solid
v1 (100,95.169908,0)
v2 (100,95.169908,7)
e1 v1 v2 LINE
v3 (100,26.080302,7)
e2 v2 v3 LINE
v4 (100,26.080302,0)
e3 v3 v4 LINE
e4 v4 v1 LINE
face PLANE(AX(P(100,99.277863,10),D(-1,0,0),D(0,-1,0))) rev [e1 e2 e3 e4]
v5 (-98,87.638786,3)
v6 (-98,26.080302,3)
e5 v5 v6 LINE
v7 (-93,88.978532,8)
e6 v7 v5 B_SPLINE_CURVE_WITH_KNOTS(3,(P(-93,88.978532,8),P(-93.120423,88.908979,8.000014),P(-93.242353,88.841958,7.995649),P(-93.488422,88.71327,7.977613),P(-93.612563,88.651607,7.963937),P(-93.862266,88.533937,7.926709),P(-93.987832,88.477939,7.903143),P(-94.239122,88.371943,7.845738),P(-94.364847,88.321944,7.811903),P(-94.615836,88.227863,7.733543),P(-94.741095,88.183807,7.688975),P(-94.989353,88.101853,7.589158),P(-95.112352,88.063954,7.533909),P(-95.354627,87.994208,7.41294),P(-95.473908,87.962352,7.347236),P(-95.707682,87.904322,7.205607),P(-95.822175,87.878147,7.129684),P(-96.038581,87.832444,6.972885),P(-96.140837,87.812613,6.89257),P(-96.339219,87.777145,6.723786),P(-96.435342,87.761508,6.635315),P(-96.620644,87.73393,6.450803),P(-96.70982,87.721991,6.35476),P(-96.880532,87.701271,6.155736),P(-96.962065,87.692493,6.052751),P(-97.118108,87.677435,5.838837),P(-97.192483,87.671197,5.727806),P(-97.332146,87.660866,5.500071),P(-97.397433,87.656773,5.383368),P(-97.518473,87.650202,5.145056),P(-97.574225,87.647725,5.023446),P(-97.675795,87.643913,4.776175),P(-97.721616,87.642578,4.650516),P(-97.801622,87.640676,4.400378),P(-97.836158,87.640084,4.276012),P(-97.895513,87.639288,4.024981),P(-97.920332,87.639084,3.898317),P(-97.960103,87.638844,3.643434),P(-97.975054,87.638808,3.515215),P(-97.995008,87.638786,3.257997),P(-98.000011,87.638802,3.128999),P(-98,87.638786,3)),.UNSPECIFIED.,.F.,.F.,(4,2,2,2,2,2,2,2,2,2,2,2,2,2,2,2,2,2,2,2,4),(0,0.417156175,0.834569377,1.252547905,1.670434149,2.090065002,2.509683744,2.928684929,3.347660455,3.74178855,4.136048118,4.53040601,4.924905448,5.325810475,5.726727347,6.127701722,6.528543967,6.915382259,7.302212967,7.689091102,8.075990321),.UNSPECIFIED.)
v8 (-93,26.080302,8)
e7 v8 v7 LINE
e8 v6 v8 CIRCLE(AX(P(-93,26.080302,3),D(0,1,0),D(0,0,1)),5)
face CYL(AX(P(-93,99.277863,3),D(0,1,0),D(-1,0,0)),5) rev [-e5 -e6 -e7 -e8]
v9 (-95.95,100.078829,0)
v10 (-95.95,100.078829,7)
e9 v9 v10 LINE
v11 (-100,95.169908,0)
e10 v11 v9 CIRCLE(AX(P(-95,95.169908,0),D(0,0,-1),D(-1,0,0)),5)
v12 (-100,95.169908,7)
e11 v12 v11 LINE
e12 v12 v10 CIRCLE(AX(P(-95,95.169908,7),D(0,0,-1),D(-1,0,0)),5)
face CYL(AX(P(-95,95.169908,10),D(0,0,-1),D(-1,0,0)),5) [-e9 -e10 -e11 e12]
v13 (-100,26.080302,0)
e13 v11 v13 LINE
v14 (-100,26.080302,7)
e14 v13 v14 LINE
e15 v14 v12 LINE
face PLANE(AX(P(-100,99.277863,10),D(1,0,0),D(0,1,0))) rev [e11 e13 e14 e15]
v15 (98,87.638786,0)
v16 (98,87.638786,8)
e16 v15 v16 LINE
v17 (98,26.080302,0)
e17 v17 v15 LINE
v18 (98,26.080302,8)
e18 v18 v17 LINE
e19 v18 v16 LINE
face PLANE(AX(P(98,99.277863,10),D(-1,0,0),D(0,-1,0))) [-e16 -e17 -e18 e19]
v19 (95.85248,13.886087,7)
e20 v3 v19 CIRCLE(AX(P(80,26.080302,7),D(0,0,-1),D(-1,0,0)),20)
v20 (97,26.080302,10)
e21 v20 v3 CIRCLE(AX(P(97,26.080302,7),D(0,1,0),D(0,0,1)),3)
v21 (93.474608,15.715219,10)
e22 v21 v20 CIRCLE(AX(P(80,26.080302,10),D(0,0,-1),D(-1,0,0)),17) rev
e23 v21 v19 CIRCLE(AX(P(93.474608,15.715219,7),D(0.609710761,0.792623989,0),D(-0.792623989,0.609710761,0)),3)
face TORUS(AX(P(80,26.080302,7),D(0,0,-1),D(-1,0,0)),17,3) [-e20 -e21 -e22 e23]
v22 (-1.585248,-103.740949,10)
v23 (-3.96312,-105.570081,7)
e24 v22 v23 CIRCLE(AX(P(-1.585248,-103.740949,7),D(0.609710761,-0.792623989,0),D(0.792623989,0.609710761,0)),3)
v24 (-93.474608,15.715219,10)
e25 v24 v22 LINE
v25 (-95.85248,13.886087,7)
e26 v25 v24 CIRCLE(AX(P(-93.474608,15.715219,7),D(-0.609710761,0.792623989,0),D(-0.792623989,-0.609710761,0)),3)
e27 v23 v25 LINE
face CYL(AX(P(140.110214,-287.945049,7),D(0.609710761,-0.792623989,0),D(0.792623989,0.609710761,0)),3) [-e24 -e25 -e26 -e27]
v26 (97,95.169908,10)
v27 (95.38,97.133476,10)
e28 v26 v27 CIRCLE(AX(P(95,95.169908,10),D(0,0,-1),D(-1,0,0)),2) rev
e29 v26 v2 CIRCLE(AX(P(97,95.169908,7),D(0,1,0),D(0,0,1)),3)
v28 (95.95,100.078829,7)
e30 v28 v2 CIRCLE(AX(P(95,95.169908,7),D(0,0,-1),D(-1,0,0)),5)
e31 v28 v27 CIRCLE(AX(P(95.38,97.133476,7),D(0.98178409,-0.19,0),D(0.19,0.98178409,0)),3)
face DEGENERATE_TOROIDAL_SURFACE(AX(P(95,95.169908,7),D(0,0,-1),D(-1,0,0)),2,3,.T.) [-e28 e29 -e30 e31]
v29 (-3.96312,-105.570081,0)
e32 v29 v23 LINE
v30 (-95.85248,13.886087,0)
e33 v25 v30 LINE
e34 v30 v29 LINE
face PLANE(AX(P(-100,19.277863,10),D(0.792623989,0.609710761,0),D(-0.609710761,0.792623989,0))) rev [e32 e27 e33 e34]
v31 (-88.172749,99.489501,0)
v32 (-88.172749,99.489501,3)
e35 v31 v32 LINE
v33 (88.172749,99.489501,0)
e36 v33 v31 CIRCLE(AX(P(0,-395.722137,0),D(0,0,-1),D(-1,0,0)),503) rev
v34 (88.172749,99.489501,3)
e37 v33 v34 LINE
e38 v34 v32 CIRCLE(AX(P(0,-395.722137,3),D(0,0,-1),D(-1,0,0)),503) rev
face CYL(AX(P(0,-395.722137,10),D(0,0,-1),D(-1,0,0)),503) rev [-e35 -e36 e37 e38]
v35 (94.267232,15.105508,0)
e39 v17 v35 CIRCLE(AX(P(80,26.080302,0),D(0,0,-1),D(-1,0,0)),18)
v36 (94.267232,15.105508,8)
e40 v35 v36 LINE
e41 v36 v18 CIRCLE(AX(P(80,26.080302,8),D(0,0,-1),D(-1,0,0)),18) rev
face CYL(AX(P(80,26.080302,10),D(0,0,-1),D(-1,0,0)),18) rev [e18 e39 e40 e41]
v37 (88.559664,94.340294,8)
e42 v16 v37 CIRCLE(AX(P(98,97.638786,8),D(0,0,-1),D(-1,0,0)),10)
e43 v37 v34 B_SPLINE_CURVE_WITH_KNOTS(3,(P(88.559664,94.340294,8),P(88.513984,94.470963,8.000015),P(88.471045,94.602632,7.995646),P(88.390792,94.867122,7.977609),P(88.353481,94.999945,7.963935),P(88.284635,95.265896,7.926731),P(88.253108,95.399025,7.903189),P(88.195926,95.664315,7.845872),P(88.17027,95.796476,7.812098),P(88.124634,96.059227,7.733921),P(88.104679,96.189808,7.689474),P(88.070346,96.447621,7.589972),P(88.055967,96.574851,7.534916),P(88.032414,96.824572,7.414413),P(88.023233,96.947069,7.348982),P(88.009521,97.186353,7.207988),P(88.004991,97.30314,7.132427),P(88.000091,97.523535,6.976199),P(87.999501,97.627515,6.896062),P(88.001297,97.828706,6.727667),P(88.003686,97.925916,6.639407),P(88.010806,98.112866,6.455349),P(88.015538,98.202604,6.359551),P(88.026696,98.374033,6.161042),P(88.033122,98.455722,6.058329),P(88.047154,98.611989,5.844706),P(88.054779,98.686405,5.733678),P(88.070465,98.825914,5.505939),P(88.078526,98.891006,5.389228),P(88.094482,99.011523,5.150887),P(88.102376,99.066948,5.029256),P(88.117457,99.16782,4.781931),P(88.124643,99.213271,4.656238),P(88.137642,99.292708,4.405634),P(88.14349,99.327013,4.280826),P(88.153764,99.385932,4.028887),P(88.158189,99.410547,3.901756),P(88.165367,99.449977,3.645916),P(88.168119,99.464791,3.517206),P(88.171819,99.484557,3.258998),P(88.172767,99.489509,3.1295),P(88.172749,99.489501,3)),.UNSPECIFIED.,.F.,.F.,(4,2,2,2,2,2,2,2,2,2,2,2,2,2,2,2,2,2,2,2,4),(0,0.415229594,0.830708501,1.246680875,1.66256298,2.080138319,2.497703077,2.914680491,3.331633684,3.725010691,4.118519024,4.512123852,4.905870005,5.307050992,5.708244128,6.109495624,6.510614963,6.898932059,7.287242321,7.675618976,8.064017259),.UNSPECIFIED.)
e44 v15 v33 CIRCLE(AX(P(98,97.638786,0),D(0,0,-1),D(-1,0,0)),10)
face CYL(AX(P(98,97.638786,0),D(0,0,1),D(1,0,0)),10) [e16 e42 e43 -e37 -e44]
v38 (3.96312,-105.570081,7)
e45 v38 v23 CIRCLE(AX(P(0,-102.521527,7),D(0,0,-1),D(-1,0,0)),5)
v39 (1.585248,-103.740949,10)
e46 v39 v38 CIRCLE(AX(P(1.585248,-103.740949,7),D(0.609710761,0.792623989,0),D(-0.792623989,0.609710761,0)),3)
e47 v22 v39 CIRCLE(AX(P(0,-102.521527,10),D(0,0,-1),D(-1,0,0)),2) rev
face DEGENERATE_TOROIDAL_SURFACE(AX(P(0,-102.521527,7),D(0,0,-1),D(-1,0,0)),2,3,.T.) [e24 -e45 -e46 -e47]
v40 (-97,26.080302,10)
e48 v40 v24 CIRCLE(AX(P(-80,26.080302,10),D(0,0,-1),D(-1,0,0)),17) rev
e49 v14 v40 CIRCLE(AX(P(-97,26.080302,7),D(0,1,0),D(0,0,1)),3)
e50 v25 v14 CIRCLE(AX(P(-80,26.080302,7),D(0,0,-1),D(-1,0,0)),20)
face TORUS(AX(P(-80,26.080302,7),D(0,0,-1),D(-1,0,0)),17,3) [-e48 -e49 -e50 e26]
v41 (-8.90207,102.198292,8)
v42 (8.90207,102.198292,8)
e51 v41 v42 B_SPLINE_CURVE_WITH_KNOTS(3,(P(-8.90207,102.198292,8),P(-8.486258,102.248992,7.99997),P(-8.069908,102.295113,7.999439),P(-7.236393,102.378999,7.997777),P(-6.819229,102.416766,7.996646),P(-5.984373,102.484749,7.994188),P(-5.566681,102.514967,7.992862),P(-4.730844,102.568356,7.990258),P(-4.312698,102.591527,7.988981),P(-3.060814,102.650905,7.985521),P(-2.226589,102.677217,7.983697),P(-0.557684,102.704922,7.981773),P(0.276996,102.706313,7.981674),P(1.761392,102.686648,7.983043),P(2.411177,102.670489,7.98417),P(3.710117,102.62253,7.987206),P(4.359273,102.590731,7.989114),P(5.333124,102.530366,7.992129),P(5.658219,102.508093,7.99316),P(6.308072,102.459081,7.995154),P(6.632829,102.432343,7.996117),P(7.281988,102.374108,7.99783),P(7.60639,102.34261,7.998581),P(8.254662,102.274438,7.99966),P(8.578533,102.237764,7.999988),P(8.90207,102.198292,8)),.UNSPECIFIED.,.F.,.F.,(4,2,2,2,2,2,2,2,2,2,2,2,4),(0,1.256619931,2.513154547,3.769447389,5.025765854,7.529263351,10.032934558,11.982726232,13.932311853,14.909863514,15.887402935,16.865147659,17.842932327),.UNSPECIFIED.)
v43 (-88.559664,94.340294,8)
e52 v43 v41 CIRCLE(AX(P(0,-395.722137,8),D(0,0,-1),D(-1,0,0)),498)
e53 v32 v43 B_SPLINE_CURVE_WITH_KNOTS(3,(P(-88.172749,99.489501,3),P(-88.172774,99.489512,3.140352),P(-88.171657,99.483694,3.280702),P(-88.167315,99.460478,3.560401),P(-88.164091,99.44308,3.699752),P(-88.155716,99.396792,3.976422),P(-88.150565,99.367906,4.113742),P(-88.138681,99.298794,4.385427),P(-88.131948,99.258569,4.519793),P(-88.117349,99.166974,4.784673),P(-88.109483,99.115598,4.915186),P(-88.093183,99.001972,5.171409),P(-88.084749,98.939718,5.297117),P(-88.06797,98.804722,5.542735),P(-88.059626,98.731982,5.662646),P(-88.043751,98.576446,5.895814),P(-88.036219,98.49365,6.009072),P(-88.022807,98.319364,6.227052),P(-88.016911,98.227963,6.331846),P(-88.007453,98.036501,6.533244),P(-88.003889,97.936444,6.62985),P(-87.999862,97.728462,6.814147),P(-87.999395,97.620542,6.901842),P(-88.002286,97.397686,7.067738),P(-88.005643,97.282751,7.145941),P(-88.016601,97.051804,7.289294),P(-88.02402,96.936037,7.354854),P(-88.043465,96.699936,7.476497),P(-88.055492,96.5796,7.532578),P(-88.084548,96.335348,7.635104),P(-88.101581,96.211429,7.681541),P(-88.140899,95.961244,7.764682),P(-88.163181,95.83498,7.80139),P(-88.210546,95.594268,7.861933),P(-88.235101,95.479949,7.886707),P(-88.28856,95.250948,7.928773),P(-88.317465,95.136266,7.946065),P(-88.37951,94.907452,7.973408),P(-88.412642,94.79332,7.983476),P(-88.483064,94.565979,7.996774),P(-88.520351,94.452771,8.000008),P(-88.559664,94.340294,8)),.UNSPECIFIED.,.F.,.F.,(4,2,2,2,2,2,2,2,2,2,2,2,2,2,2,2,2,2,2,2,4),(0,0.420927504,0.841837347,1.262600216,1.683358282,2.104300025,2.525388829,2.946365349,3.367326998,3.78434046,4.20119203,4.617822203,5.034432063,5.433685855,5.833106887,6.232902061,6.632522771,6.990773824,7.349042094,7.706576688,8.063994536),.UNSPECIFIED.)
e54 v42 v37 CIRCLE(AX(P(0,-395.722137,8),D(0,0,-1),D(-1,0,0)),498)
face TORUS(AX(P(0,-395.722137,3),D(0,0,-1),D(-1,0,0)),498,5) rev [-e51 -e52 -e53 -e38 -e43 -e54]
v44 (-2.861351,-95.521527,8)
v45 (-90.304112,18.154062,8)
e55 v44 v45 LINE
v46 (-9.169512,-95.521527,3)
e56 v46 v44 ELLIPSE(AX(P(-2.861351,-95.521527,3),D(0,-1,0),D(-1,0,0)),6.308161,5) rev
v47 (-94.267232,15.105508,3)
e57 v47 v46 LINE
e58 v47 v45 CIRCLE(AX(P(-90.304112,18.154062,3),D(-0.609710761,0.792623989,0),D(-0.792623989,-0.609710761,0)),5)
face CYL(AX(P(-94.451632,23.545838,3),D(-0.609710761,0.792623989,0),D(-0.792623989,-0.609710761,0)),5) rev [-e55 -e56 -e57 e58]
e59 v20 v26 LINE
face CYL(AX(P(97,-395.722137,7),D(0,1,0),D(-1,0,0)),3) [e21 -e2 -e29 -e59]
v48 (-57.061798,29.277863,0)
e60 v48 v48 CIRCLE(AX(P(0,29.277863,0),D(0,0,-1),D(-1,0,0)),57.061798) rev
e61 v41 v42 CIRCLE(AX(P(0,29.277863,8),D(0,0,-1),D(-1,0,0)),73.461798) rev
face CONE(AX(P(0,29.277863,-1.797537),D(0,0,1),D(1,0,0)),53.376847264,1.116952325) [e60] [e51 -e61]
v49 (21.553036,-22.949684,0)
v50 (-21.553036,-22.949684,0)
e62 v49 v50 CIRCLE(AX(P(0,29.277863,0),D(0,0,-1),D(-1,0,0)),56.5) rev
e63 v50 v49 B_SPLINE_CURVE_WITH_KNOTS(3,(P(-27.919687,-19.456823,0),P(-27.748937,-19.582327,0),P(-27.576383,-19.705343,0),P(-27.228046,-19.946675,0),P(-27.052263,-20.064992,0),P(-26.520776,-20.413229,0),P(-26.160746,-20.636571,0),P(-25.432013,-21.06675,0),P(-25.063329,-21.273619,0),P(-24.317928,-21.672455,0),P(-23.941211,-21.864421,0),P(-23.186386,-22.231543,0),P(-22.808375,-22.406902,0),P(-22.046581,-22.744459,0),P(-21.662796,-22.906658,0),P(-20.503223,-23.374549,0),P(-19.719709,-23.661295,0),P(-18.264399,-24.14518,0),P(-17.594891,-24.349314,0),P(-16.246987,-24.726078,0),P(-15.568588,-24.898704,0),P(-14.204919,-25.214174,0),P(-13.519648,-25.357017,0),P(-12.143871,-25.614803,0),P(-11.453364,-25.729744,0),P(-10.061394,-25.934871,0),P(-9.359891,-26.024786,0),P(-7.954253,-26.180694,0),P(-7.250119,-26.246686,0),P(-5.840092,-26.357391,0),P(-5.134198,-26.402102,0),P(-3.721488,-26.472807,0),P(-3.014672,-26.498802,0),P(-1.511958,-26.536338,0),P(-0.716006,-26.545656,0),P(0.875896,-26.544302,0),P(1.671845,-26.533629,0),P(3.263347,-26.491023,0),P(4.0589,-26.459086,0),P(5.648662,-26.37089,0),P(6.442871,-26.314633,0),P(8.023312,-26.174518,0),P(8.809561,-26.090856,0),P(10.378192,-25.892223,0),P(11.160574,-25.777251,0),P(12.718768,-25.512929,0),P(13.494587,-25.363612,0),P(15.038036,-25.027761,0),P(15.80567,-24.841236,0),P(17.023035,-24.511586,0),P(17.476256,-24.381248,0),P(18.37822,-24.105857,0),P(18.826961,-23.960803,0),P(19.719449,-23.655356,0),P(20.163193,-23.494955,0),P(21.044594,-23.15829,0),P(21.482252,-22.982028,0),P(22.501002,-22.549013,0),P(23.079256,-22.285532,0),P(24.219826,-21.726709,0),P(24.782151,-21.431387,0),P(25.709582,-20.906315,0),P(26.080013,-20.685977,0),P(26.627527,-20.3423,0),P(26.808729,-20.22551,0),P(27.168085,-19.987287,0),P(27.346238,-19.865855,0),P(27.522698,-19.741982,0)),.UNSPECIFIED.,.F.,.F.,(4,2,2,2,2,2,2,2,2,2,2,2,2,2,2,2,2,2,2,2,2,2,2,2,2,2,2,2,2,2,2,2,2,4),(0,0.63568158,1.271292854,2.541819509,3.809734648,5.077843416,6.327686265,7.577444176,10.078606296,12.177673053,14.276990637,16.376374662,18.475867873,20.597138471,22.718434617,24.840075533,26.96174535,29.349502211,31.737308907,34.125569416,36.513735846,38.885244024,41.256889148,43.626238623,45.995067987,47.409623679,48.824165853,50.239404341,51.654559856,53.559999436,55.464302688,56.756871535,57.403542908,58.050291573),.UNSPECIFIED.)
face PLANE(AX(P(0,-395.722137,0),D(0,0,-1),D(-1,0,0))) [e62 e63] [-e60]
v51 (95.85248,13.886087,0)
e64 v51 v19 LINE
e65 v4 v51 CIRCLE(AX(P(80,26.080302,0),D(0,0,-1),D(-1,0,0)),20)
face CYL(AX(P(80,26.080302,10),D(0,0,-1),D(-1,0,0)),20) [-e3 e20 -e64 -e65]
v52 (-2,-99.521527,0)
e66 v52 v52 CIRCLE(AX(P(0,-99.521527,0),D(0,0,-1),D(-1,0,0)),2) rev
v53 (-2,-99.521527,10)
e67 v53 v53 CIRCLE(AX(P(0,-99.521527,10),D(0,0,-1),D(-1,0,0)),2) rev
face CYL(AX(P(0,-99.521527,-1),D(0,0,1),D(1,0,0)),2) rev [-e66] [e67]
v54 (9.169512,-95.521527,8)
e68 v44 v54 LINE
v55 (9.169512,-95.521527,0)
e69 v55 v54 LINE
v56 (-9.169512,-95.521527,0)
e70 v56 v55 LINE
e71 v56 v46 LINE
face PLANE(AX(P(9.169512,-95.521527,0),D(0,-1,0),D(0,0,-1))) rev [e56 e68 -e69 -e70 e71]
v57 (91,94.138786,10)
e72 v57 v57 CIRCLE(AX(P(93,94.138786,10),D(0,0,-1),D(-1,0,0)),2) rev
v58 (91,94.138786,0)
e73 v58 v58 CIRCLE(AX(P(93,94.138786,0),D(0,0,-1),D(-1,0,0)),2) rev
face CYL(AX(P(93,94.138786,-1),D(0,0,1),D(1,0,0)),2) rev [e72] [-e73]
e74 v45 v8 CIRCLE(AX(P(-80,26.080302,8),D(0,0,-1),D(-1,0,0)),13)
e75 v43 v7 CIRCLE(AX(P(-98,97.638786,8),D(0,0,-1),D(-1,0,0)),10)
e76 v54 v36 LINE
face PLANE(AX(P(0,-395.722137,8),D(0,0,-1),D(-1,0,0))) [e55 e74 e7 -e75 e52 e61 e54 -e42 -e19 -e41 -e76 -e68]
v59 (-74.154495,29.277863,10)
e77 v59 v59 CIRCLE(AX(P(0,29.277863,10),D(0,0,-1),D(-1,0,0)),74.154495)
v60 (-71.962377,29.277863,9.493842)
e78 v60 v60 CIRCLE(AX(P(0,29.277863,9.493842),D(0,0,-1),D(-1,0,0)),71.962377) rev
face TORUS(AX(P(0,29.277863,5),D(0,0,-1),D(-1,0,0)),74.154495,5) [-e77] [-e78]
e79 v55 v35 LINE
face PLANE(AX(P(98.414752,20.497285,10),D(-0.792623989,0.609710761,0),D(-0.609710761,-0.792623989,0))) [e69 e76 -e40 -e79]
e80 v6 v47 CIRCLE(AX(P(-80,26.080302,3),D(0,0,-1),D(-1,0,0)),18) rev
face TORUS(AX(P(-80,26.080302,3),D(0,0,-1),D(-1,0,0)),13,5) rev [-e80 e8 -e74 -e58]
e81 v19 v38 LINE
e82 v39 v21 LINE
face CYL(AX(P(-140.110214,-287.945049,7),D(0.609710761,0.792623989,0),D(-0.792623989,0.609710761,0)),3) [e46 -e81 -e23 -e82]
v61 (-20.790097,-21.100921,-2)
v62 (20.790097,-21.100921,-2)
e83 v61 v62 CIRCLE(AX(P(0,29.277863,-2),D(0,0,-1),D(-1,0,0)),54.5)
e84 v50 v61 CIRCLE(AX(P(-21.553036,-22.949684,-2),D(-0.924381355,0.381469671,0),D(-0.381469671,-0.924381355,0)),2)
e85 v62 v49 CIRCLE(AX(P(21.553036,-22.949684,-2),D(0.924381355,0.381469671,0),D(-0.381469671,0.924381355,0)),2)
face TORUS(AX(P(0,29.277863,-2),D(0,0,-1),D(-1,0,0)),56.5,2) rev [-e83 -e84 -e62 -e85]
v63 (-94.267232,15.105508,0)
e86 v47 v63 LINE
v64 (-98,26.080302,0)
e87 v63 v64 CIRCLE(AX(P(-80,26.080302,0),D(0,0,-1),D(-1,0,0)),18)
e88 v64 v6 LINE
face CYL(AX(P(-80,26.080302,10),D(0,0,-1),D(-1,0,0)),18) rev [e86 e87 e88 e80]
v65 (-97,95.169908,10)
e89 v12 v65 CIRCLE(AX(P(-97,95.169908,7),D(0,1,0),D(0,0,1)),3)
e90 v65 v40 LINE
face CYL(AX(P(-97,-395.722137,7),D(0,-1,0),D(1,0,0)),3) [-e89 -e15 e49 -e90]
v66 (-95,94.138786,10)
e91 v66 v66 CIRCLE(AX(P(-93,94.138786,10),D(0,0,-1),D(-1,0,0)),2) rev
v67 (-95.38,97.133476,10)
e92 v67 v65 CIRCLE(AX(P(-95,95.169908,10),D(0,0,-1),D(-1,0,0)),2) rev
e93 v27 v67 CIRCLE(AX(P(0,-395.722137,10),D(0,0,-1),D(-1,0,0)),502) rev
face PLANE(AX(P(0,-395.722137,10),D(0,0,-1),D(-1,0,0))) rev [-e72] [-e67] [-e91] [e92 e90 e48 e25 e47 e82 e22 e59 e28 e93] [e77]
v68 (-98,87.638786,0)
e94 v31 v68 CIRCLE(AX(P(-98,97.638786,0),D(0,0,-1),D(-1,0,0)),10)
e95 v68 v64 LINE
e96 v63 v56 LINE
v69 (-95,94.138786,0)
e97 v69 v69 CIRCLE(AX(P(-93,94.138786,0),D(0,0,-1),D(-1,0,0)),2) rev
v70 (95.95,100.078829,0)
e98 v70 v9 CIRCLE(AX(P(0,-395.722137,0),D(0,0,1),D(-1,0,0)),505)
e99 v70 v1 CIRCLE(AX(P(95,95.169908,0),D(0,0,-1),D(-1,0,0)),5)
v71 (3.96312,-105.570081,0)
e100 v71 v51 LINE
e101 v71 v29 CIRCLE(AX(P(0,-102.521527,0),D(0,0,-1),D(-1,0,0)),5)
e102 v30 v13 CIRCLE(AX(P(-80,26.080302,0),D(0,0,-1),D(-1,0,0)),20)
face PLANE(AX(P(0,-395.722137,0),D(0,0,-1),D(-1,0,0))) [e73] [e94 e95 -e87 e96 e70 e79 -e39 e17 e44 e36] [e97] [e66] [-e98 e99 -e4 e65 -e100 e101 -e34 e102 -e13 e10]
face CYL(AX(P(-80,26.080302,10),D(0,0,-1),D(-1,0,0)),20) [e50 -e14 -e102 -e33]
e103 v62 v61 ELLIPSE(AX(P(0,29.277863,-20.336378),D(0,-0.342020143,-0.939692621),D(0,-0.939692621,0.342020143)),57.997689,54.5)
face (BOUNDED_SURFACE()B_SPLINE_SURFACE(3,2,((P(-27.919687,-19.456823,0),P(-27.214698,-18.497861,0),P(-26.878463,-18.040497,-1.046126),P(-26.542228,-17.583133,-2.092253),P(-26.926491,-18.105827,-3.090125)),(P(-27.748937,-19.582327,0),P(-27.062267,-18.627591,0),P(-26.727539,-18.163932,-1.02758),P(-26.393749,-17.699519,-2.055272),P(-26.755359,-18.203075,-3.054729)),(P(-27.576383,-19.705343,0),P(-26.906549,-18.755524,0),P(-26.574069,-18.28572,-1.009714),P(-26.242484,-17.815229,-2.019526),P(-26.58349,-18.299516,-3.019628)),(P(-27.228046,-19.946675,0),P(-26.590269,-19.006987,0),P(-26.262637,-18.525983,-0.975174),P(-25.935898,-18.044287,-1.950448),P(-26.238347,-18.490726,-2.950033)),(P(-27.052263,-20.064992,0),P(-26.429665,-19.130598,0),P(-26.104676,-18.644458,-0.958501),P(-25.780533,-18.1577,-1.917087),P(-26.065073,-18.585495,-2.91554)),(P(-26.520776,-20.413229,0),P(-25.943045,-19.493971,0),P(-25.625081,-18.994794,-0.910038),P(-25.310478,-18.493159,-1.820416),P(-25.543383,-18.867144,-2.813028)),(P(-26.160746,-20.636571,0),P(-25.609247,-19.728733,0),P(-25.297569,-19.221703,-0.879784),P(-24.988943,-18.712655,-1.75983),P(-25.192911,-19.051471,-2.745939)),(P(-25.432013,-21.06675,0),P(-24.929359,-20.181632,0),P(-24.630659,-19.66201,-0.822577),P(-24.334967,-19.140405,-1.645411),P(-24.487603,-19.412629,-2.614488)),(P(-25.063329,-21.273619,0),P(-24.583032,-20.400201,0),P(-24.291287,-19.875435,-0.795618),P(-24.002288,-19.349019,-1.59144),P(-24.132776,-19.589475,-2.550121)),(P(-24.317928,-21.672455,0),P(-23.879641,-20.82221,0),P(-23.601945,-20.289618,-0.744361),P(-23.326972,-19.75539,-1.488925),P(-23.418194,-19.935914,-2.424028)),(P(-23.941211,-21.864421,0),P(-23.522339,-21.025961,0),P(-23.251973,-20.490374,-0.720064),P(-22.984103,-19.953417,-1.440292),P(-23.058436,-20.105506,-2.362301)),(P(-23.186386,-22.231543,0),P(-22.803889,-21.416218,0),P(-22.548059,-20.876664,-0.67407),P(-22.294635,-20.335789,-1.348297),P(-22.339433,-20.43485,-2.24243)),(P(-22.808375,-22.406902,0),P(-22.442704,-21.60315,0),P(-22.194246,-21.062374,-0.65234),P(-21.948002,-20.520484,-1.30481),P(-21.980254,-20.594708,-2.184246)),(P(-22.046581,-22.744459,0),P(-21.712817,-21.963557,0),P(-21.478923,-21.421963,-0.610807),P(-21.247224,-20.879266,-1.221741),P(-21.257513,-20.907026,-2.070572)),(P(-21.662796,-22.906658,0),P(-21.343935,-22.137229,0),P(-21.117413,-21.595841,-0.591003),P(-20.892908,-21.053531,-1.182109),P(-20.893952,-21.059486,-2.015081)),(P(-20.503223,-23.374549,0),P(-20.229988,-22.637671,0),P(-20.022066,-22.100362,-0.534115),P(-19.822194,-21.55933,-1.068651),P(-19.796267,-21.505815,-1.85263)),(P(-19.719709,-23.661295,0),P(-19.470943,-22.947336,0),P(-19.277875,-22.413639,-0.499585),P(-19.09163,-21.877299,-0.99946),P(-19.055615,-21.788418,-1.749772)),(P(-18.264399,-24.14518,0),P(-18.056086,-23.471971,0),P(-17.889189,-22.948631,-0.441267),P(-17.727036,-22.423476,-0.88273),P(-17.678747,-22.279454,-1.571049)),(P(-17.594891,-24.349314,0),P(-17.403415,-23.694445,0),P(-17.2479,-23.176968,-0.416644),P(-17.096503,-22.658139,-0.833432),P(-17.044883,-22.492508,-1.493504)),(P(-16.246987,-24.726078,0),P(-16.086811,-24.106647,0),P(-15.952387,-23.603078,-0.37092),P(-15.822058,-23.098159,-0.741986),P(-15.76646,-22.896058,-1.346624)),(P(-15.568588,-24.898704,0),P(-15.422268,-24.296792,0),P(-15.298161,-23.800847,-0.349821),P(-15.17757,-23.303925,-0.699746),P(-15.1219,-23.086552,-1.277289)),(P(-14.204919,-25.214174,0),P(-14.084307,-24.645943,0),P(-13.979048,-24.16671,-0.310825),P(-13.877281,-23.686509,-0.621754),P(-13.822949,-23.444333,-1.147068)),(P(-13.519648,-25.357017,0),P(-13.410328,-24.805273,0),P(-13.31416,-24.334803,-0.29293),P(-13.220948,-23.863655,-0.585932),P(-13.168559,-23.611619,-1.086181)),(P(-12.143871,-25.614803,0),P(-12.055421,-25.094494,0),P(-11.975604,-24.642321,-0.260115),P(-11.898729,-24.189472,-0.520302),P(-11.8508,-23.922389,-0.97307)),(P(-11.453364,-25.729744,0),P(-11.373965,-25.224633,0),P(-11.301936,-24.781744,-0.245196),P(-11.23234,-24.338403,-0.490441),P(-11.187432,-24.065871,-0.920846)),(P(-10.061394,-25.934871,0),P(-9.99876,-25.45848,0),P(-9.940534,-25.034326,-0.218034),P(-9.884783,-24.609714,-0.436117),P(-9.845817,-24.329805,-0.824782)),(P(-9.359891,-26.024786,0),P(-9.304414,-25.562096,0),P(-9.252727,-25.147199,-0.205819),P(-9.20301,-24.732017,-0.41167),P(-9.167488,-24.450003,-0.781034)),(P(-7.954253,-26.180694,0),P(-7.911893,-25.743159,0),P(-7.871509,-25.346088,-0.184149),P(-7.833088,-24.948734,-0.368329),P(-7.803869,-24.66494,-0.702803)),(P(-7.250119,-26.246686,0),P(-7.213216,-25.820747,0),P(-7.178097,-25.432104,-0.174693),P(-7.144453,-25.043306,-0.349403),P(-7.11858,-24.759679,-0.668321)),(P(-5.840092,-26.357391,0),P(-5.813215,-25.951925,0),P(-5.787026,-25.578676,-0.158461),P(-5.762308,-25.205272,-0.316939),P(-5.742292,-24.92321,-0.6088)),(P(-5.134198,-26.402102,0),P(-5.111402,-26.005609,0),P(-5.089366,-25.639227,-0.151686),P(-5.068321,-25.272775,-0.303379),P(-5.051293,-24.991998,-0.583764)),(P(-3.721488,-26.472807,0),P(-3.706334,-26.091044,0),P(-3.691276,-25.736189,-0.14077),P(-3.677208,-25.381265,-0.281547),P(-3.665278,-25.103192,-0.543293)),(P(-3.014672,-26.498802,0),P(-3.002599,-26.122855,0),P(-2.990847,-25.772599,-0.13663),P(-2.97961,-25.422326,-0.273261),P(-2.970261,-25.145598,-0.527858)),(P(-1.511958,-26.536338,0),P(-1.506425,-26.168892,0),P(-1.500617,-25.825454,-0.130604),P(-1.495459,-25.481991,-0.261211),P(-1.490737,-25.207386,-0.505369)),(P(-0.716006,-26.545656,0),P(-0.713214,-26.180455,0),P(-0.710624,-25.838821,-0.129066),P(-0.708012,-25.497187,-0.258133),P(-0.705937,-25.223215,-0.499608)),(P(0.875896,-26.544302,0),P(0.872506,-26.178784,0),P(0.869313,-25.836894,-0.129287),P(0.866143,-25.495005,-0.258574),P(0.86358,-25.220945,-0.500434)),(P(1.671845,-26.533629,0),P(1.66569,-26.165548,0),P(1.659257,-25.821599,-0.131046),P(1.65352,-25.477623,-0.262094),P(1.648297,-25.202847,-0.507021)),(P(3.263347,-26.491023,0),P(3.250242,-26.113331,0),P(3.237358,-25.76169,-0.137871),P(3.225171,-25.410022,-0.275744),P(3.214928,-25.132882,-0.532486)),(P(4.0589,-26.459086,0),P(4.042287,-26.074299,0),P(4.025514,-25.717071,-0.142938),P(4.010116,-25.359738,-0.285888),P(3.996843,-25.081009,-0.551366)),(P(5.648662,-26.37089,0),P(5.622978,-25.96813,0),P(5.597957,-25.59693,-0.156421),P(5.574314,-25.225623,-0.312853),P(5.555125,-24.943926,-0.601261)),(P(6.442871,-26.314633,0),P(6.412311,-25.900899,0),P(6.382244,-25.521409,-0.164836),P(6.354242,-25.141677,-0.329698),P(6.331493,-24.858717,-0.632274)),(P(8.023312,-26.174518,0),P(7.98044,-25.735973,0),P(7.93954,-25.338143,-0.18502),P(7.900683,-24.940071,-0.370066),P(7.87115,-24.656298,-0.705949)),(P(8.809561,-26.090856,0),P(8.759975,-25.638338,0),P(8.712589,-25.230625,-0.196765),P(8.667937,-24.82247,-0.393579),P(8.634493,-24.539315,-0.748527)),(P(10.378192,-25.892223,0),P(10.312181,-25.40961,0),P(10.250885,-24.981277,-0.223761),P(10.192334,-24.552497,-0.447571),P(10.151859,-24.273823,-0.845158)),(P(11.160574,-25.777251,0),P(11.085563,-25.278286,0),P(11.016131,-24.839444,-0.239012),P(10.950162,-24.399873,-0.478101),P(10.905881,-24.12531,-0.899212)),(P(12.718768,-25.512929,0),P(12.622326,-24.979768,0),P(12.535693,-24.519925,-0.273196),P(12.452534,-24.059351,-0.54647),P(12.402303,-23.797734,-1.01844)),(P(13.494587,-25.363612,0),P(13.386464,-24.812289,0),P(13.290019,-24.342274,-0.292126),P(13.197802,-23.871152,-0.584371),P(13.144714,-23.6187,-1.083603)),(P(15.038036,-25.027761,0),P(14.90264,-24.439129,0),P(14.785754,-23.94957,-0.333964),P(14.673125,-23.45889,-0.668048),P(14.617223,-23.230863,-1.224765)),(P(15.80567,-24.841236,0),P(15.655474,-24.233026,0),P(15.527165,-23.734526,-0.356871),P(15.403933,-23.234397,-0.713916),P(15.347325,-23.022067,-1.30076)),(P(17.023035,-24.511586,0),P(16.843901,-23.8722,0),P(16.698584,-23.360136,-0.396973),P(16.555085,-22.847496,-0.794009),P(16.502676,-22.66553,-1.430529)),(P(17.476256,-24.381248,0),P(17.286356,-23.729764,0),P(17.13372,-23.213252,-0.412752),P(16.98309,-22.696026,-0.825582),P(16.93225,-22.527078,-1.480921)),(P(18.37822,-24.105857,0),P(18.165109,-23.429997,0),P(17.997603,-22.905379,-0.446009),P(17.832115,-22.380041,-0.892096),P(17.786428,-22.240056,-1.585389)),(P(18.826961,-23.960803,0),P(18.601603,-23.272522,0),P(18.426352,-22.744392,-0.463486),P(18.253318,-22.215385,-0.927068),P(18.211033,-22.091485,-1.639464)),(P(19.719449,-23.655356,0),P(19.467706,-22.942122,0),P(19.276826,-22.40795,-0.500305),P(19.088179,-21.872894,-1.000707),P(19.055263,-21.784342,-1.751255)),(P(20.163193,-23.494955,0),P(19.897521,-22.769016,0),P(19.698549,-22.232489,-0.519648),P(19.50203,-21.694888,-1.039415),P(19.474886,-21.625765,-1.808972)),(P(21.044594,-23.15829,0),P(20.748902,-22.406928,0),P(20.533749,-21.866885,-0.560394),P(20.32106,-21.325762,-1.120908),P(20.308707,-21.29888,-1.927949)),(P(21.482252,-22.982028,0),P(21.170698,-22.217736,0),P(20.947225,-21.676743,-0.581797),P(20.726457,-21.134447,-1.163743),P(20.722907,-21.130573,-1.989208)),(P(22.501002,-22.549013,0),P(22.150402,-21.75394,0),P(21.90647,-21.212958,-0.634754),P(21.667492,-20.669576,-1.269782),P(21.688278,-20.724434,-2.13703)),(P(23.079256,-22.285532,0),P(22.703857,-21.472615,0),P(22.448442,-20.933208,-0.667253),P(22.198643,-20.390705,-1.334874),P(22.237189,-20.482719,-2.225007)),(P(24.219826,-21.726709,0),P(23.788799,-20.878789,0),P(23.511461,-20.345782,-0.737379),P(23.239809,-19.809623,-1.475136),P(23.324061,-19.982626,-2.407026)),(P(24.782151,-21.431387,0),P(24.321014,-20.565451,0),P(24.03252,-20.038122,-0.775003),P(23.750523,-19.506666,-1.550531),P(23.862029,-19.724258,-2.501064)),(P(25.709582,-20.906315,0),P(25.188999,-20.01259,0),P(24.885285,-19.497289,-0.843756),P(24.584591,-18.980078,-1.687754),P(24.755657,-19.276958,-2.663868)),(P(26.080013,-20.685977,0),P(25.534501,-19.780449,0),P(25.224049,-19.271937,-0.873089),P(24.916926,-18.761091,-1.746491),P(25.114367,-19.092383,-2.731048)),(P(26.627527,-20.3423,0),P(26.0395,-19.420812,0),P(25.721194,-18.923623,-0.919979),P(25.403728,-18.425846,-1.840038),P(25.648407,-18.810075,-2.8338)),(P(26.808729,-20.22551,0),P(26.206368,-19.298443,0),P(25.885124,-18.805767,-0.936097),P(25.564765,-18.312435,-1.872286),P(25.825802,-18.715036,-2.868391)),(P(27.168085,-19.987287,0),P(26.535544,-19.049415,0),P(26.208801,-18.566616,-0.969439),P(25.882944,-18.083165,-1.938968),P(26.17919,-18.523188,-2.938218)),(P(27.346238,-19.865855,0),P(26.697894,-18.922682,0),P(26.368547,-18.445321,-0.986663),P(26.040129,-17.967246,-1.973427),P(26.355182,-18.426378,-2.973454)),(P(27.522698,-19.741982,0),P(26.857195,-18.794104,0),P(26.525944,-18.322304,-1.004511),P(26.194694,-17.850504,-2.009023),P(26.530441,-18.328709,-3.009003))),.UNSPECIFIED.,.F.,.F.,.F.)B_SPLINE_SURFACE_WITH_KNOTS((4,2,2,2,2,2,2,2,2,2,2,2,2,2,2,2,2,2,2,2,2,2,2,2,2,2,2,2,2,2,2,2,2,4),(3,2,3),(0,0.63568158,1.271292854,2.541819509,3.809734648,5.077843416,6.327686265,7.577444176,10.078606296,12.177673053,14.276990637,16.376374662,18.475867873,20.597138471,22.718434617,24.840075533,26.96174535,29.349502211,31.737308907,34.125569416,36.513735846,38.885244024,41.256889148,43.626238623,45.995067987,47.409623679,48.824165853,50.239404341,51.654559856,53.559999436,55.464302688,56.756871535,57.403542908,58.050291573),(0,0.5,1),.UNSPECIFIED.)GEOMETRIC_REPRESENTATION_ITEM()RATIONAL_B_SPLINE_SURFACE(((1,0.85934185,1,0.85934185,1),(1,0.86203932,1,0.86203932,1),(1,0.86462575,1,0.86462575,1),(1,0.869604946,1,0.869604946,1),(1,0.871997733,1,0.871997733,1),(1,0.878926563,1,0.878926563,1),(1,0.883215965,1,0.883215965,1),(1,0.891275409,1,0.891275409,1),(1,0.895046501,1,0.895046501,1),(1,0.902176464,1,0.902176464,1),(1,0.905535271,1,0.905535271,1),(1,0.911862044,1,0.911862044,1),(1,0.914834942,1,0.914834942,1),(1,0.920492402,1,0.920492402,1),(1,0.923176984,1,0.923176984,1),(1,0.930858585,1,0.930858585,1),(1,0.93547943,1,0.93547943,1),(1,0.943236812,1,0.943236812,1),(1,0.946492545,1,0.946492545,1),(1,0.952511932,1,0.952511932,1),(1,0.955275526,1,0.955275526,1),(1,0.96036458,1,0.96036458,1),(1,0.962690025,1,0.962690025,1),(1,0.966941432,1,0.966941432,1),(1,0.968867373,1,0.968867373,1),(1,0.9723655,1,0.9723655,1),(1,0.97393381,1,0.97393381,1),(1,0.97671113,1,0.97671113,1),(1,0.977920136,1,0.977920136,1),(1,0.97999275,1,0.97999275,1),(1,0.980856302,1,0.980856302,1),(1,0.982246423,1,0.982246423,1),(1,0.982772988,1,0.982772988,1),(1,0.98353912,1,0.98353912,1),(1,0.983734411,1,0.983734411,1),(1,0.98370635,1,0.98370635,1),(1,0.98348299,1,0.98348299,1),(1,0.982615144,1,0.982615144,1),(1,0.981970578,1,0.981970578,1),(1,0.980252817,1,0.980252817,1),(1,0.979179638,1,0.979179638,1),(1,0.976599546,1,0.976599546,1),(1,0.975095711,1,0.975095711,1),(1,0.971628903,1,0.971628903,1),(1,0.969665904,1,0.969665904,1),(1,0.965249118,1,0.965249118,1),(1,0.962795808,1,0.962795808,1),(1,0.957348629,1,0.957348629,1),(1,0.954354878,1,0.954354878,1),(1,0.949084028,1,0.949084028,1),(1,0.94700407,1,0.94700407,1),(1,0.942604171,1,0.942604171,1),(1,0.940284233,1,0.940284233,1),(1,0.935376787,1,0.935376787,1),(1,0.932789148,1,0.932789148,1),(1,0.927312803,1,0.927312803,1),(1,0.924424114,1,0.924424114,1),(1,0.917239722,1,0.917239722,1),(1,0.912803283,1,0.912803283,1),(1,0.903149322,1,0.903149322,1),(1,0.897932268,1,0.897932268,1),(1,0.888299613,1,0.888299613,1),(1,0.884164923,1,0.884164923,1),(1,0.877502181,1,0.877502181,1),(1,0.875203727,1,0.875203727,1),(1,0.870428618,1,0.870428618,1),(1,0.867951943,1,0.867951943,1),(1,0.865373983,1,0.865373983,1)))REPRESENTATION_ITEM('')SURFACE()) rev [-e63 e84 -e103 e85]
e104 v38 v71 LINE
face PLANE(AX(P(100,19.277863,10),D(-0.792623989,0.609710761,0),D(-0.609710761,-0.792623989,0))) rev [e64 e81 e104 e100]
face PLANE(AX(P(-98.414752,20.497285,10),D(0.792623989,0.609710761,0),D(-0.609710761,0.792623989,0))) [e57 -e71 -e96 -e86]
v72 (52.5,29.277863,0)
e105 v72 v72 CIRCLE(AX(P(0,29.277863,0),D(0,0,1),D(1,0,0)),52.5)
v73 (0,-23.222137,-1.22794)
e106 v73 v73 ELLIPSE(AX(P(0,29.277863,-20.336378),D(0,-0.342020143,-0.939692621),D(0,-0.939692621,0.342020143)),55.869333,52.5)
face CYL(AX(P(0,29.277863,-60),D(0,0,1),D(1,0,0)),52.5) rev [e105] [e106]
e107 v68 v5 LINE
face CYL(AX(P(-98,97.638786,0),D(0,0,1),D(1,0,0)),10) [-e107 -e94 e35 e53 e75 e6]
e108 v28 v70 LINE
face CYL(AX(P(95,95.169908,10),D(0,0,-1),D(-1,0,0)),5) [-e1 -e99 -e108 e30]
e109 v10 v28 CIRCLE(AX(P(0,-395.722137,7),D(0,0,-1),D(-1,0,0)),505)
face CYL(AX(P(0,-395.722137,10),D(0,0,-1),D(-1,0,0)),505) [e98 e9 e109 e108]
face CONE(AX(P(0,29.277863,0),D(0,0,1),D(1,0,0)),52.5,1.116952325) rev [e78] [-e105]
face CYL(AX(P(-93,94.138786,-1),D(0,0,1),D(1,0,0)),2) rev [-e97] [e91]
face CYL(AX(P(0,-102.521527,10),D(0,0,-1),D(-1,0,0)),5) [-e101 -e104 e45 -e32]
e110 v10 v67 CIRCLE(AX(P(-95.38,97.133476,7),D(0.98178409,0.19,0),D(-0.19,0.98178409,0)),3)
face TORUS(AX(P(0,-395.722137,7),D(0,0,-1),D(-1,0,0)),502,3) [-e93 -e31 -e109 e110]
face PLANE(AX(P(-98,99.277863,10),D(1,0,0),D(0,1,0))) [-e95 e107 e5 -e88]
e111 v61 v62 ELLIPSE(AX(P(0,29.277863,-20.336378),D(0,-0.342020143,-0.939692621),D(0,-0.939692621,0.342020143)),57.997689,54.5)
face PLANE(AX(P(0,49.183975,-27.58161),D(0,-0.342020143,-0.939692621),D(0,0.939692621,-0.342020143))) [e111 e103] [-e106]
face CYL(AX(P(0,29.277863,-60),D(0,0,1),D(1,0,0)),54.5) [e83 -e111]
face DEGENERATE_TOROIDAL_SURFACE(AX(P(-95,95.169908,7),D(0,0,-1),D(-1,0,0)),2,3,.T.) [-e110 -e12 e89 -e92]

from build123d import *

# Parameters (mm, degrees)
BOSS_EXTRUDE1_DEPTH = 10
SKETCH3_R           = 73
SKETCH2_R           = 52.5
FILLET3_R           = 5
FILLET4_R           = 20
SHELL4_T            = -2
BOSS_EXTRUDE3_START = 8
BOSS_EXTRUDE3_DEPTH = 8
SKETCH16_R          = 2
CUT_EXTRUDE8_DEPTH  = 9
SKETCH5_R           = 54.5
SKETCH5_R_2         = 52.5
BOSS_EXTRUDE2_DEPTH = 60
SKETCH9_R           = 112.367107934
CUT_EXTRUDE5_DEPTH  = 60
SKETCH10_R          = 91.913425111
CUT_EXTRUDE6_DEPTH  = 10
SKETCH11_R          = 79.181330982
CUT_EXTRUDE7_DEPTH  = 10
FILLET5_R           = 5
FILLET6_R           = 5
FILLET7_R           = 3
FILLET8_R           = 5
FILLET9_R           = 2
FILLET10_R          = 5


with BuildPart() as part:
    # Sketch1 → Boss-Extrude1 (new body)
    with BuildSketch(Plane.XY):
        with BuildLine():
            Line((100, 99.277863028), (100, 19.277863028))
            Line((100, 19.277863028), (0, -110.722136972))
            Line((0, -110.722136972), (-100, 19.277863028))
            Line((-100, 19.277863028), (-100, 99.277863028))
            ThreePointArc((-100, 99.277863028), (0, 109.277863028), (100, 99.277863028))
        make_face()
    extrude(amount=BOSS_EXTRUDE1_DEPTH)

    # Sketch3 → Cut-Loft1 section 0
    with BuildSketch(Plane.XY.offset(10)):
        with Locations((0, 29.277863028)):
            Circle(SKETCH3_R)
    # Sketch2 → Cut-Loft1 section 1
    with BuildSketch(Plane.XY):
        with Locations((0, 29.277863028)):
            Circle(SKETCH2_R)
    loft(mode=Mode.SUBTRACT)

    # Fillet3
    fillet3_edges = [part.edges().sort_by_distance(p)[0] for p in [
        (0, -110.722136972, 5),
    ]]
    fillet(fillet3_edges, radius=FILLET3_R)

    # Fillet4
    fillet4_edges = [part.edges().sort_by_distance(p)[0] for p in [
        (100, 19.277863028, 5),
        (-100, 19.277863028, 5),
    ]]
    fillet(fillet4_edges, radius=FILLET4_R)

    # Shell4
    shell4_openings = [part.faces().sort_by_distance(p)[0] for p in [
        (47.569868433, -44.043588356, 0),
    ]]
    offset(amount=SHELL4_T, openings=shell4_openings, kind=Kind.INTERSECTION)

    # Sketch12 → Boss-Extrude3 (add)
    with BuildSketch(Plane(origin=(0, 0, 8), x_dir=(-1, 0, 0), z_dir=(0, 0, -1)).offset(BOSS_EXTRUDE3_START)):
        with BuildLine():
            Line((-9.169512185, -95.521527238), (9.169512185, -95.521527238))
            Line((9.169512185, -95.521527238), (2.377871967, -104.350659521))
            ThreePointArc((2.377871967, -104.350659521), (0, -105.521527238), (-2.377871967, -104.350659521))
            Line((-2.377871967, -104.350659521), (-9.169512185, -95.521527238))
        make_face()
        with BuildLine():
            Line((98, 87.63878568), (98, 97.63878568))
            ThreePointArc((98, 97.63878568), (93.090974034, 98.588565475), (88.172749454, 99.48950087))
            ThreePointArc((88.172749454, 99.48950087), (90.302365562, 91.255493109), (98, 87.63878568))
        make_face()
        with BuildLine():
            Line((-98, 97.63878568), (-98, 87.63878568))
            ThreePointArc((-98, 87.63878568), (-90.302365562, 91.255493109), (-88.172749454, 99.48950087))
            ThreePointArc((-88.172749454, 99.48950087), (-93.090974034, 98.588565475), (-98, 97.63878568))
        make_face()
    extrude(amount=-BOSS_EXTRUDE3_DEPTH)

    # Sketch16 → Cut-Extrude8 (cut, symmetric)
    with BuildSketch(Plane(origin=(0, 0, 8), x_dir=(-1, 0, 0), z_dir=(0, 0, -1))):
        with Locations((0, -99.521527238)):
            Circle(SKETCH16_R)
        with Locations((-93, 94.13878568)):
            Circle(SKETCH16_R)
        with Locations((93, 94.13878568)):
            Circle(SKETCH16_R)
    extrude(amount=CUT_EXTRUDE8_DEPTH, both=True, mode=Mode.SUBTRACT)

    # Sketch5 → Boss-Extrude2 (add)
    with BuildSketch(Plane(origin=(0, 0, 0), x_dir=(-1, 0, 0), z_dir=(0, 0, -1))):
        with Locations(Location((0, 29.277863028, 0), (0, 0, 180))):
            Circle(SKETCH5_R)
        with Locations(Location((0, 29.277863028, 0), (0, 0, 180))):
            Circle(SKETCH5_R_2, mode=Mode.SUBTRACT)
    extrude(amount=BOSS_EXTRUDE2_DEPTH)

    # Sketch9 → Cut-Extrude5 (cut)
    with BuildSketch(Plane(origin=(0, -4.696341029, -10.071335838), x_dir=(-1, 0, 0), z_dir=(0, -0.42261826174070327, -0.9063077870366482))):
        with Locations((0, 89.719397921)):
            Circle(SKETCH9_R)
    extrude(amount=CUT_EXTRUDE5_DEPTH, mode=Mode.SUBTRACT)

    # Sketch10 → Cut-Extrude6 (cut)
    with BuildSketch(Plane(origin=(0, -4.030519152, -9.495308079), x_dir=(-1, 0, 0), z_dir=(0, -0.39073112848928093, -0.9205048534524374))):
        with Locations((0, 68.891691178)):
            Circle(SKETCH10_R)
    extrude(amount=CUT_EXTRUDE6_DEPTH, mode=Mode.SUBTRACT)

    # Sketch11 → Cut-Extrude7 (cut)
    with BuildSketch(Plane(origin=(0, -3.111126453, -8.547749678), x_dir=(-1, 0, 0), z_dir=(0, -0.34202014332567576, -0.9396926207859059))):
        with Locations((0, 55.651285061)):
            Circle(SKETCH11_R)
    extrude(amount=CUT_EXTRUDE7_DEPTH, mode=Mode.SUBTRACT)

    # Fillet5
    fillet5_edges = [part.edges().sort_by_distance(p)[0] for p in [
        (100, 99.277863028, 5),
    ]]
    fillet(fillet5_edges, radius=FILLET5_R)

    # Fillet6
    fillet6_edges = [part.edges().sort_by_distance(p)[0] for p in [
        (-100, 99.277863028, 5),
    ]]
    fillet(fillet6_edges, radius=FILLET6_R)

    # Fillet7
    fillet7_edges = [part.edges().sort_by_distance(p)[0] for p in [
        (0, 109.277863028, 10),
        (98.856812155, 98.351888702, 10),
        (-100, 60.625105075, 10),
        (-98.856812155, 98.351888702, 10),
        (49.907799864, -45.841997149, 10),
        (0, -107.521527238, 10),
        (100, 60.625105075, 10),
        (-49.907799864, -45.841997149, 10),
        (-98.934751063, 19.640177571, 10),
        (98.934751063, 19.640177571, 10),
    ]]
    fillet(fillet7_edges, radius=FILLET7_R)

    # Fillet8
    fillet8_edges = [part.edges().sort_by_distance(p)[0] for p in [
        (-73, 29.277863028, 10),
    ]]
    fillet(fillet8_edges, radius=FILLET8_R)

    # Fillet9
    fillet9_edges = [part.edges().sort_by_distance(p)[0] for p in [
        (-54.5, 29.277863028, 0),
    ]]
    fillet(fillet9_edges, radius=FILLET9_R)

    # Fillet10
    # the kernel refuses this fillet: 5 mm, written as the material it adds along each edge
    with BuildSketch(Plane(origin=(-80, 26.080301962, 8), x_dir=(-1, 0, 0), z_dir=(0, 1, 0))) as fillet10_piece_1:
        with BuildLine():
            CenterArc((18 - FILLET10_R, -FILLET10_R), FILLET10_R, 0, 90)
            Line((18, -FILLET10_R), (18 + FILLET10_R * 0.02, -FILLET10_R))
            Line((18 + FILLET10_R * 0.02, -FILLET10_R), (18 + FILLET10_R * 0.02, FILLET10_R * 0.02))
            Line((18 + FILLET10_R * 0.02, FILLET10_R * 0.02), (18 - FILLET10_R, FILLET10_R * 0.02))
            Line((18 - FILLET10_R, FILLET10_R * 0.02), (18 - FILLET10_R, 0))
        make_face()
    revolve(axis=Axis((-80, 26.080301962, 8), (0, 0, 1)), revolution_arc=37.568592029)
    with BuildSketch(Plane(origin=(-1.548127674, -105.429327102, 8), x_dir=(0.7926239891046, 0.6097107608496924, 0), z_dir=(-0.6097107608496926, 0.7926239891046001, 0))) as fillet10_piece_2_section:
        with BuildLine():
            CenterArc((FILLET10_R, FILLET10_R), FILLET10_R, 180, 90)
            Line((0, FILLET10_R), (-FILLET10_R * 0.02, FILLET10_R))
            Line((-FILLET10_R * 0.02, FILLET10_R), (-FILLET10_R * 0.02, -FILLET10_R * 0.02))
            Line((-FILLET10_R * 0.02, -FILLET10_R * 0.02), (FILLET10_R, -FILLET10_R * 0.02))
            Line((FILLET10_R, -FILLET10_R * 0.02), (FILLET10_R, 0))
        make_face()
    fillet10_piece_2 = extrude(amount=152.07063756, mode=Mode.PRIVATE)
    fillet10_piece_2 = split(fillet10_piece_2, bisect_by=Plane(origin=(-50.54915131, -95.521527238, 6.871784101), z_dir=(0, 1, 0)), keep=Keep.TOP, mode=Mode.PRIVATE)
    add(fillet10_piece_2)
    with BuildSketch(Plane(origin=(-98, 26.080301962, 8), x_dir=(1, 0, 0), z_dir=(0, 1, 0))) as fillet10_piece_3_section:
        with BuildLine():
            CenterArc((FILLET10_R, FILLET10_R), FILLET10_R, 180, 90)
            Line((0, FILLET10_R), (-FILLET10_R * 0.02, FILLET10_R))
            Line((-FILLET10_R * 0.02, FILLET10_R), (-FILLET10_R * 0.02, -FILLET10_R * 0.02))
            Line((-FILLET10_R * 0.02, -FILLET10_R * 0.02), (FILLET10_R, -FILLET10_R * 0.02))
            Line((FILLET10_R, -FILLET10_R * 0.02), (FILLET10_R, 0))
        make_face()
    fillet10_piece_3 = extrude(amount=74.058483718, mode=Mode.PRIVATE)
    fillet10_piece_3 = fillet10_piece_3 - Plane(origin=(-98, 97.63878568, 6.86971186), x_dir=(0.9827250545662549, 0.18507151895348808, 0), z_dir=(0, 0, -1)) * Cylinder(10, 169, mode=Mode.PRIVATE)
    add(fillet10_piece_3)
    with BuildSketch(Plane(origin=(0, -395.722136972, 8), x_dir=(-0.19970369332898327, 0.9798563337912163, 0), z_dir=(-0.9798563337912163, -0.19970369332898327, 0))) as fillet10_piece_4_section:
        with BuildLine():
            CenterArc((503 - FILLET10_R, FILLET10_R), FILLET10_R, 270, 90)
            Line((503, FILLET10_R), (503 + FILLET10_R * 0.02, FILLET10_R))
            Line((503 + FILLET10_R * 0.02, FILLET10_R), (503 + FILLET10_R * 0.02, -FILLET10_R * 0.02))
            Line((503 + FILLET10_R * 0.02, -FILLET10_R * 0.02), (503 - FILLET10_R, -FILLET10_R * 0.02))
            Line((503 - FILLET10_R, -FILLET10_R * 0.02), (503 - FILLET10_R, 0))
        make_face()
    fillet10_piece_4 = revolve(axis=Axis((0, -395.722136972, 8), (0, 0, -1)), revolution_arc=23.03926473, mode=Mode.PRIVATE)
    fillet10_piece_4 = fillet10_piece_4 - Plane(origin=(-98, 97.63878568, 6.609161961), x_dir=(0.9827250545662549, 0.18507151895348808, 0), z_dir=(0, 0, -1)) * Cylinder(10, 2013, mode=Mode.PRIVATE)
    fillet10_piece_4 = fillet10_piece_4 - Plane(origin=(98, 97.63878568, 6.609161961), x_dir=(0, -1, 0), z_dir=(0, 0, -1)) * Cylinder(10, 2013, mode=Mode.PRIVATE)
    add(fillet10_piece_4)


solid = part.part
